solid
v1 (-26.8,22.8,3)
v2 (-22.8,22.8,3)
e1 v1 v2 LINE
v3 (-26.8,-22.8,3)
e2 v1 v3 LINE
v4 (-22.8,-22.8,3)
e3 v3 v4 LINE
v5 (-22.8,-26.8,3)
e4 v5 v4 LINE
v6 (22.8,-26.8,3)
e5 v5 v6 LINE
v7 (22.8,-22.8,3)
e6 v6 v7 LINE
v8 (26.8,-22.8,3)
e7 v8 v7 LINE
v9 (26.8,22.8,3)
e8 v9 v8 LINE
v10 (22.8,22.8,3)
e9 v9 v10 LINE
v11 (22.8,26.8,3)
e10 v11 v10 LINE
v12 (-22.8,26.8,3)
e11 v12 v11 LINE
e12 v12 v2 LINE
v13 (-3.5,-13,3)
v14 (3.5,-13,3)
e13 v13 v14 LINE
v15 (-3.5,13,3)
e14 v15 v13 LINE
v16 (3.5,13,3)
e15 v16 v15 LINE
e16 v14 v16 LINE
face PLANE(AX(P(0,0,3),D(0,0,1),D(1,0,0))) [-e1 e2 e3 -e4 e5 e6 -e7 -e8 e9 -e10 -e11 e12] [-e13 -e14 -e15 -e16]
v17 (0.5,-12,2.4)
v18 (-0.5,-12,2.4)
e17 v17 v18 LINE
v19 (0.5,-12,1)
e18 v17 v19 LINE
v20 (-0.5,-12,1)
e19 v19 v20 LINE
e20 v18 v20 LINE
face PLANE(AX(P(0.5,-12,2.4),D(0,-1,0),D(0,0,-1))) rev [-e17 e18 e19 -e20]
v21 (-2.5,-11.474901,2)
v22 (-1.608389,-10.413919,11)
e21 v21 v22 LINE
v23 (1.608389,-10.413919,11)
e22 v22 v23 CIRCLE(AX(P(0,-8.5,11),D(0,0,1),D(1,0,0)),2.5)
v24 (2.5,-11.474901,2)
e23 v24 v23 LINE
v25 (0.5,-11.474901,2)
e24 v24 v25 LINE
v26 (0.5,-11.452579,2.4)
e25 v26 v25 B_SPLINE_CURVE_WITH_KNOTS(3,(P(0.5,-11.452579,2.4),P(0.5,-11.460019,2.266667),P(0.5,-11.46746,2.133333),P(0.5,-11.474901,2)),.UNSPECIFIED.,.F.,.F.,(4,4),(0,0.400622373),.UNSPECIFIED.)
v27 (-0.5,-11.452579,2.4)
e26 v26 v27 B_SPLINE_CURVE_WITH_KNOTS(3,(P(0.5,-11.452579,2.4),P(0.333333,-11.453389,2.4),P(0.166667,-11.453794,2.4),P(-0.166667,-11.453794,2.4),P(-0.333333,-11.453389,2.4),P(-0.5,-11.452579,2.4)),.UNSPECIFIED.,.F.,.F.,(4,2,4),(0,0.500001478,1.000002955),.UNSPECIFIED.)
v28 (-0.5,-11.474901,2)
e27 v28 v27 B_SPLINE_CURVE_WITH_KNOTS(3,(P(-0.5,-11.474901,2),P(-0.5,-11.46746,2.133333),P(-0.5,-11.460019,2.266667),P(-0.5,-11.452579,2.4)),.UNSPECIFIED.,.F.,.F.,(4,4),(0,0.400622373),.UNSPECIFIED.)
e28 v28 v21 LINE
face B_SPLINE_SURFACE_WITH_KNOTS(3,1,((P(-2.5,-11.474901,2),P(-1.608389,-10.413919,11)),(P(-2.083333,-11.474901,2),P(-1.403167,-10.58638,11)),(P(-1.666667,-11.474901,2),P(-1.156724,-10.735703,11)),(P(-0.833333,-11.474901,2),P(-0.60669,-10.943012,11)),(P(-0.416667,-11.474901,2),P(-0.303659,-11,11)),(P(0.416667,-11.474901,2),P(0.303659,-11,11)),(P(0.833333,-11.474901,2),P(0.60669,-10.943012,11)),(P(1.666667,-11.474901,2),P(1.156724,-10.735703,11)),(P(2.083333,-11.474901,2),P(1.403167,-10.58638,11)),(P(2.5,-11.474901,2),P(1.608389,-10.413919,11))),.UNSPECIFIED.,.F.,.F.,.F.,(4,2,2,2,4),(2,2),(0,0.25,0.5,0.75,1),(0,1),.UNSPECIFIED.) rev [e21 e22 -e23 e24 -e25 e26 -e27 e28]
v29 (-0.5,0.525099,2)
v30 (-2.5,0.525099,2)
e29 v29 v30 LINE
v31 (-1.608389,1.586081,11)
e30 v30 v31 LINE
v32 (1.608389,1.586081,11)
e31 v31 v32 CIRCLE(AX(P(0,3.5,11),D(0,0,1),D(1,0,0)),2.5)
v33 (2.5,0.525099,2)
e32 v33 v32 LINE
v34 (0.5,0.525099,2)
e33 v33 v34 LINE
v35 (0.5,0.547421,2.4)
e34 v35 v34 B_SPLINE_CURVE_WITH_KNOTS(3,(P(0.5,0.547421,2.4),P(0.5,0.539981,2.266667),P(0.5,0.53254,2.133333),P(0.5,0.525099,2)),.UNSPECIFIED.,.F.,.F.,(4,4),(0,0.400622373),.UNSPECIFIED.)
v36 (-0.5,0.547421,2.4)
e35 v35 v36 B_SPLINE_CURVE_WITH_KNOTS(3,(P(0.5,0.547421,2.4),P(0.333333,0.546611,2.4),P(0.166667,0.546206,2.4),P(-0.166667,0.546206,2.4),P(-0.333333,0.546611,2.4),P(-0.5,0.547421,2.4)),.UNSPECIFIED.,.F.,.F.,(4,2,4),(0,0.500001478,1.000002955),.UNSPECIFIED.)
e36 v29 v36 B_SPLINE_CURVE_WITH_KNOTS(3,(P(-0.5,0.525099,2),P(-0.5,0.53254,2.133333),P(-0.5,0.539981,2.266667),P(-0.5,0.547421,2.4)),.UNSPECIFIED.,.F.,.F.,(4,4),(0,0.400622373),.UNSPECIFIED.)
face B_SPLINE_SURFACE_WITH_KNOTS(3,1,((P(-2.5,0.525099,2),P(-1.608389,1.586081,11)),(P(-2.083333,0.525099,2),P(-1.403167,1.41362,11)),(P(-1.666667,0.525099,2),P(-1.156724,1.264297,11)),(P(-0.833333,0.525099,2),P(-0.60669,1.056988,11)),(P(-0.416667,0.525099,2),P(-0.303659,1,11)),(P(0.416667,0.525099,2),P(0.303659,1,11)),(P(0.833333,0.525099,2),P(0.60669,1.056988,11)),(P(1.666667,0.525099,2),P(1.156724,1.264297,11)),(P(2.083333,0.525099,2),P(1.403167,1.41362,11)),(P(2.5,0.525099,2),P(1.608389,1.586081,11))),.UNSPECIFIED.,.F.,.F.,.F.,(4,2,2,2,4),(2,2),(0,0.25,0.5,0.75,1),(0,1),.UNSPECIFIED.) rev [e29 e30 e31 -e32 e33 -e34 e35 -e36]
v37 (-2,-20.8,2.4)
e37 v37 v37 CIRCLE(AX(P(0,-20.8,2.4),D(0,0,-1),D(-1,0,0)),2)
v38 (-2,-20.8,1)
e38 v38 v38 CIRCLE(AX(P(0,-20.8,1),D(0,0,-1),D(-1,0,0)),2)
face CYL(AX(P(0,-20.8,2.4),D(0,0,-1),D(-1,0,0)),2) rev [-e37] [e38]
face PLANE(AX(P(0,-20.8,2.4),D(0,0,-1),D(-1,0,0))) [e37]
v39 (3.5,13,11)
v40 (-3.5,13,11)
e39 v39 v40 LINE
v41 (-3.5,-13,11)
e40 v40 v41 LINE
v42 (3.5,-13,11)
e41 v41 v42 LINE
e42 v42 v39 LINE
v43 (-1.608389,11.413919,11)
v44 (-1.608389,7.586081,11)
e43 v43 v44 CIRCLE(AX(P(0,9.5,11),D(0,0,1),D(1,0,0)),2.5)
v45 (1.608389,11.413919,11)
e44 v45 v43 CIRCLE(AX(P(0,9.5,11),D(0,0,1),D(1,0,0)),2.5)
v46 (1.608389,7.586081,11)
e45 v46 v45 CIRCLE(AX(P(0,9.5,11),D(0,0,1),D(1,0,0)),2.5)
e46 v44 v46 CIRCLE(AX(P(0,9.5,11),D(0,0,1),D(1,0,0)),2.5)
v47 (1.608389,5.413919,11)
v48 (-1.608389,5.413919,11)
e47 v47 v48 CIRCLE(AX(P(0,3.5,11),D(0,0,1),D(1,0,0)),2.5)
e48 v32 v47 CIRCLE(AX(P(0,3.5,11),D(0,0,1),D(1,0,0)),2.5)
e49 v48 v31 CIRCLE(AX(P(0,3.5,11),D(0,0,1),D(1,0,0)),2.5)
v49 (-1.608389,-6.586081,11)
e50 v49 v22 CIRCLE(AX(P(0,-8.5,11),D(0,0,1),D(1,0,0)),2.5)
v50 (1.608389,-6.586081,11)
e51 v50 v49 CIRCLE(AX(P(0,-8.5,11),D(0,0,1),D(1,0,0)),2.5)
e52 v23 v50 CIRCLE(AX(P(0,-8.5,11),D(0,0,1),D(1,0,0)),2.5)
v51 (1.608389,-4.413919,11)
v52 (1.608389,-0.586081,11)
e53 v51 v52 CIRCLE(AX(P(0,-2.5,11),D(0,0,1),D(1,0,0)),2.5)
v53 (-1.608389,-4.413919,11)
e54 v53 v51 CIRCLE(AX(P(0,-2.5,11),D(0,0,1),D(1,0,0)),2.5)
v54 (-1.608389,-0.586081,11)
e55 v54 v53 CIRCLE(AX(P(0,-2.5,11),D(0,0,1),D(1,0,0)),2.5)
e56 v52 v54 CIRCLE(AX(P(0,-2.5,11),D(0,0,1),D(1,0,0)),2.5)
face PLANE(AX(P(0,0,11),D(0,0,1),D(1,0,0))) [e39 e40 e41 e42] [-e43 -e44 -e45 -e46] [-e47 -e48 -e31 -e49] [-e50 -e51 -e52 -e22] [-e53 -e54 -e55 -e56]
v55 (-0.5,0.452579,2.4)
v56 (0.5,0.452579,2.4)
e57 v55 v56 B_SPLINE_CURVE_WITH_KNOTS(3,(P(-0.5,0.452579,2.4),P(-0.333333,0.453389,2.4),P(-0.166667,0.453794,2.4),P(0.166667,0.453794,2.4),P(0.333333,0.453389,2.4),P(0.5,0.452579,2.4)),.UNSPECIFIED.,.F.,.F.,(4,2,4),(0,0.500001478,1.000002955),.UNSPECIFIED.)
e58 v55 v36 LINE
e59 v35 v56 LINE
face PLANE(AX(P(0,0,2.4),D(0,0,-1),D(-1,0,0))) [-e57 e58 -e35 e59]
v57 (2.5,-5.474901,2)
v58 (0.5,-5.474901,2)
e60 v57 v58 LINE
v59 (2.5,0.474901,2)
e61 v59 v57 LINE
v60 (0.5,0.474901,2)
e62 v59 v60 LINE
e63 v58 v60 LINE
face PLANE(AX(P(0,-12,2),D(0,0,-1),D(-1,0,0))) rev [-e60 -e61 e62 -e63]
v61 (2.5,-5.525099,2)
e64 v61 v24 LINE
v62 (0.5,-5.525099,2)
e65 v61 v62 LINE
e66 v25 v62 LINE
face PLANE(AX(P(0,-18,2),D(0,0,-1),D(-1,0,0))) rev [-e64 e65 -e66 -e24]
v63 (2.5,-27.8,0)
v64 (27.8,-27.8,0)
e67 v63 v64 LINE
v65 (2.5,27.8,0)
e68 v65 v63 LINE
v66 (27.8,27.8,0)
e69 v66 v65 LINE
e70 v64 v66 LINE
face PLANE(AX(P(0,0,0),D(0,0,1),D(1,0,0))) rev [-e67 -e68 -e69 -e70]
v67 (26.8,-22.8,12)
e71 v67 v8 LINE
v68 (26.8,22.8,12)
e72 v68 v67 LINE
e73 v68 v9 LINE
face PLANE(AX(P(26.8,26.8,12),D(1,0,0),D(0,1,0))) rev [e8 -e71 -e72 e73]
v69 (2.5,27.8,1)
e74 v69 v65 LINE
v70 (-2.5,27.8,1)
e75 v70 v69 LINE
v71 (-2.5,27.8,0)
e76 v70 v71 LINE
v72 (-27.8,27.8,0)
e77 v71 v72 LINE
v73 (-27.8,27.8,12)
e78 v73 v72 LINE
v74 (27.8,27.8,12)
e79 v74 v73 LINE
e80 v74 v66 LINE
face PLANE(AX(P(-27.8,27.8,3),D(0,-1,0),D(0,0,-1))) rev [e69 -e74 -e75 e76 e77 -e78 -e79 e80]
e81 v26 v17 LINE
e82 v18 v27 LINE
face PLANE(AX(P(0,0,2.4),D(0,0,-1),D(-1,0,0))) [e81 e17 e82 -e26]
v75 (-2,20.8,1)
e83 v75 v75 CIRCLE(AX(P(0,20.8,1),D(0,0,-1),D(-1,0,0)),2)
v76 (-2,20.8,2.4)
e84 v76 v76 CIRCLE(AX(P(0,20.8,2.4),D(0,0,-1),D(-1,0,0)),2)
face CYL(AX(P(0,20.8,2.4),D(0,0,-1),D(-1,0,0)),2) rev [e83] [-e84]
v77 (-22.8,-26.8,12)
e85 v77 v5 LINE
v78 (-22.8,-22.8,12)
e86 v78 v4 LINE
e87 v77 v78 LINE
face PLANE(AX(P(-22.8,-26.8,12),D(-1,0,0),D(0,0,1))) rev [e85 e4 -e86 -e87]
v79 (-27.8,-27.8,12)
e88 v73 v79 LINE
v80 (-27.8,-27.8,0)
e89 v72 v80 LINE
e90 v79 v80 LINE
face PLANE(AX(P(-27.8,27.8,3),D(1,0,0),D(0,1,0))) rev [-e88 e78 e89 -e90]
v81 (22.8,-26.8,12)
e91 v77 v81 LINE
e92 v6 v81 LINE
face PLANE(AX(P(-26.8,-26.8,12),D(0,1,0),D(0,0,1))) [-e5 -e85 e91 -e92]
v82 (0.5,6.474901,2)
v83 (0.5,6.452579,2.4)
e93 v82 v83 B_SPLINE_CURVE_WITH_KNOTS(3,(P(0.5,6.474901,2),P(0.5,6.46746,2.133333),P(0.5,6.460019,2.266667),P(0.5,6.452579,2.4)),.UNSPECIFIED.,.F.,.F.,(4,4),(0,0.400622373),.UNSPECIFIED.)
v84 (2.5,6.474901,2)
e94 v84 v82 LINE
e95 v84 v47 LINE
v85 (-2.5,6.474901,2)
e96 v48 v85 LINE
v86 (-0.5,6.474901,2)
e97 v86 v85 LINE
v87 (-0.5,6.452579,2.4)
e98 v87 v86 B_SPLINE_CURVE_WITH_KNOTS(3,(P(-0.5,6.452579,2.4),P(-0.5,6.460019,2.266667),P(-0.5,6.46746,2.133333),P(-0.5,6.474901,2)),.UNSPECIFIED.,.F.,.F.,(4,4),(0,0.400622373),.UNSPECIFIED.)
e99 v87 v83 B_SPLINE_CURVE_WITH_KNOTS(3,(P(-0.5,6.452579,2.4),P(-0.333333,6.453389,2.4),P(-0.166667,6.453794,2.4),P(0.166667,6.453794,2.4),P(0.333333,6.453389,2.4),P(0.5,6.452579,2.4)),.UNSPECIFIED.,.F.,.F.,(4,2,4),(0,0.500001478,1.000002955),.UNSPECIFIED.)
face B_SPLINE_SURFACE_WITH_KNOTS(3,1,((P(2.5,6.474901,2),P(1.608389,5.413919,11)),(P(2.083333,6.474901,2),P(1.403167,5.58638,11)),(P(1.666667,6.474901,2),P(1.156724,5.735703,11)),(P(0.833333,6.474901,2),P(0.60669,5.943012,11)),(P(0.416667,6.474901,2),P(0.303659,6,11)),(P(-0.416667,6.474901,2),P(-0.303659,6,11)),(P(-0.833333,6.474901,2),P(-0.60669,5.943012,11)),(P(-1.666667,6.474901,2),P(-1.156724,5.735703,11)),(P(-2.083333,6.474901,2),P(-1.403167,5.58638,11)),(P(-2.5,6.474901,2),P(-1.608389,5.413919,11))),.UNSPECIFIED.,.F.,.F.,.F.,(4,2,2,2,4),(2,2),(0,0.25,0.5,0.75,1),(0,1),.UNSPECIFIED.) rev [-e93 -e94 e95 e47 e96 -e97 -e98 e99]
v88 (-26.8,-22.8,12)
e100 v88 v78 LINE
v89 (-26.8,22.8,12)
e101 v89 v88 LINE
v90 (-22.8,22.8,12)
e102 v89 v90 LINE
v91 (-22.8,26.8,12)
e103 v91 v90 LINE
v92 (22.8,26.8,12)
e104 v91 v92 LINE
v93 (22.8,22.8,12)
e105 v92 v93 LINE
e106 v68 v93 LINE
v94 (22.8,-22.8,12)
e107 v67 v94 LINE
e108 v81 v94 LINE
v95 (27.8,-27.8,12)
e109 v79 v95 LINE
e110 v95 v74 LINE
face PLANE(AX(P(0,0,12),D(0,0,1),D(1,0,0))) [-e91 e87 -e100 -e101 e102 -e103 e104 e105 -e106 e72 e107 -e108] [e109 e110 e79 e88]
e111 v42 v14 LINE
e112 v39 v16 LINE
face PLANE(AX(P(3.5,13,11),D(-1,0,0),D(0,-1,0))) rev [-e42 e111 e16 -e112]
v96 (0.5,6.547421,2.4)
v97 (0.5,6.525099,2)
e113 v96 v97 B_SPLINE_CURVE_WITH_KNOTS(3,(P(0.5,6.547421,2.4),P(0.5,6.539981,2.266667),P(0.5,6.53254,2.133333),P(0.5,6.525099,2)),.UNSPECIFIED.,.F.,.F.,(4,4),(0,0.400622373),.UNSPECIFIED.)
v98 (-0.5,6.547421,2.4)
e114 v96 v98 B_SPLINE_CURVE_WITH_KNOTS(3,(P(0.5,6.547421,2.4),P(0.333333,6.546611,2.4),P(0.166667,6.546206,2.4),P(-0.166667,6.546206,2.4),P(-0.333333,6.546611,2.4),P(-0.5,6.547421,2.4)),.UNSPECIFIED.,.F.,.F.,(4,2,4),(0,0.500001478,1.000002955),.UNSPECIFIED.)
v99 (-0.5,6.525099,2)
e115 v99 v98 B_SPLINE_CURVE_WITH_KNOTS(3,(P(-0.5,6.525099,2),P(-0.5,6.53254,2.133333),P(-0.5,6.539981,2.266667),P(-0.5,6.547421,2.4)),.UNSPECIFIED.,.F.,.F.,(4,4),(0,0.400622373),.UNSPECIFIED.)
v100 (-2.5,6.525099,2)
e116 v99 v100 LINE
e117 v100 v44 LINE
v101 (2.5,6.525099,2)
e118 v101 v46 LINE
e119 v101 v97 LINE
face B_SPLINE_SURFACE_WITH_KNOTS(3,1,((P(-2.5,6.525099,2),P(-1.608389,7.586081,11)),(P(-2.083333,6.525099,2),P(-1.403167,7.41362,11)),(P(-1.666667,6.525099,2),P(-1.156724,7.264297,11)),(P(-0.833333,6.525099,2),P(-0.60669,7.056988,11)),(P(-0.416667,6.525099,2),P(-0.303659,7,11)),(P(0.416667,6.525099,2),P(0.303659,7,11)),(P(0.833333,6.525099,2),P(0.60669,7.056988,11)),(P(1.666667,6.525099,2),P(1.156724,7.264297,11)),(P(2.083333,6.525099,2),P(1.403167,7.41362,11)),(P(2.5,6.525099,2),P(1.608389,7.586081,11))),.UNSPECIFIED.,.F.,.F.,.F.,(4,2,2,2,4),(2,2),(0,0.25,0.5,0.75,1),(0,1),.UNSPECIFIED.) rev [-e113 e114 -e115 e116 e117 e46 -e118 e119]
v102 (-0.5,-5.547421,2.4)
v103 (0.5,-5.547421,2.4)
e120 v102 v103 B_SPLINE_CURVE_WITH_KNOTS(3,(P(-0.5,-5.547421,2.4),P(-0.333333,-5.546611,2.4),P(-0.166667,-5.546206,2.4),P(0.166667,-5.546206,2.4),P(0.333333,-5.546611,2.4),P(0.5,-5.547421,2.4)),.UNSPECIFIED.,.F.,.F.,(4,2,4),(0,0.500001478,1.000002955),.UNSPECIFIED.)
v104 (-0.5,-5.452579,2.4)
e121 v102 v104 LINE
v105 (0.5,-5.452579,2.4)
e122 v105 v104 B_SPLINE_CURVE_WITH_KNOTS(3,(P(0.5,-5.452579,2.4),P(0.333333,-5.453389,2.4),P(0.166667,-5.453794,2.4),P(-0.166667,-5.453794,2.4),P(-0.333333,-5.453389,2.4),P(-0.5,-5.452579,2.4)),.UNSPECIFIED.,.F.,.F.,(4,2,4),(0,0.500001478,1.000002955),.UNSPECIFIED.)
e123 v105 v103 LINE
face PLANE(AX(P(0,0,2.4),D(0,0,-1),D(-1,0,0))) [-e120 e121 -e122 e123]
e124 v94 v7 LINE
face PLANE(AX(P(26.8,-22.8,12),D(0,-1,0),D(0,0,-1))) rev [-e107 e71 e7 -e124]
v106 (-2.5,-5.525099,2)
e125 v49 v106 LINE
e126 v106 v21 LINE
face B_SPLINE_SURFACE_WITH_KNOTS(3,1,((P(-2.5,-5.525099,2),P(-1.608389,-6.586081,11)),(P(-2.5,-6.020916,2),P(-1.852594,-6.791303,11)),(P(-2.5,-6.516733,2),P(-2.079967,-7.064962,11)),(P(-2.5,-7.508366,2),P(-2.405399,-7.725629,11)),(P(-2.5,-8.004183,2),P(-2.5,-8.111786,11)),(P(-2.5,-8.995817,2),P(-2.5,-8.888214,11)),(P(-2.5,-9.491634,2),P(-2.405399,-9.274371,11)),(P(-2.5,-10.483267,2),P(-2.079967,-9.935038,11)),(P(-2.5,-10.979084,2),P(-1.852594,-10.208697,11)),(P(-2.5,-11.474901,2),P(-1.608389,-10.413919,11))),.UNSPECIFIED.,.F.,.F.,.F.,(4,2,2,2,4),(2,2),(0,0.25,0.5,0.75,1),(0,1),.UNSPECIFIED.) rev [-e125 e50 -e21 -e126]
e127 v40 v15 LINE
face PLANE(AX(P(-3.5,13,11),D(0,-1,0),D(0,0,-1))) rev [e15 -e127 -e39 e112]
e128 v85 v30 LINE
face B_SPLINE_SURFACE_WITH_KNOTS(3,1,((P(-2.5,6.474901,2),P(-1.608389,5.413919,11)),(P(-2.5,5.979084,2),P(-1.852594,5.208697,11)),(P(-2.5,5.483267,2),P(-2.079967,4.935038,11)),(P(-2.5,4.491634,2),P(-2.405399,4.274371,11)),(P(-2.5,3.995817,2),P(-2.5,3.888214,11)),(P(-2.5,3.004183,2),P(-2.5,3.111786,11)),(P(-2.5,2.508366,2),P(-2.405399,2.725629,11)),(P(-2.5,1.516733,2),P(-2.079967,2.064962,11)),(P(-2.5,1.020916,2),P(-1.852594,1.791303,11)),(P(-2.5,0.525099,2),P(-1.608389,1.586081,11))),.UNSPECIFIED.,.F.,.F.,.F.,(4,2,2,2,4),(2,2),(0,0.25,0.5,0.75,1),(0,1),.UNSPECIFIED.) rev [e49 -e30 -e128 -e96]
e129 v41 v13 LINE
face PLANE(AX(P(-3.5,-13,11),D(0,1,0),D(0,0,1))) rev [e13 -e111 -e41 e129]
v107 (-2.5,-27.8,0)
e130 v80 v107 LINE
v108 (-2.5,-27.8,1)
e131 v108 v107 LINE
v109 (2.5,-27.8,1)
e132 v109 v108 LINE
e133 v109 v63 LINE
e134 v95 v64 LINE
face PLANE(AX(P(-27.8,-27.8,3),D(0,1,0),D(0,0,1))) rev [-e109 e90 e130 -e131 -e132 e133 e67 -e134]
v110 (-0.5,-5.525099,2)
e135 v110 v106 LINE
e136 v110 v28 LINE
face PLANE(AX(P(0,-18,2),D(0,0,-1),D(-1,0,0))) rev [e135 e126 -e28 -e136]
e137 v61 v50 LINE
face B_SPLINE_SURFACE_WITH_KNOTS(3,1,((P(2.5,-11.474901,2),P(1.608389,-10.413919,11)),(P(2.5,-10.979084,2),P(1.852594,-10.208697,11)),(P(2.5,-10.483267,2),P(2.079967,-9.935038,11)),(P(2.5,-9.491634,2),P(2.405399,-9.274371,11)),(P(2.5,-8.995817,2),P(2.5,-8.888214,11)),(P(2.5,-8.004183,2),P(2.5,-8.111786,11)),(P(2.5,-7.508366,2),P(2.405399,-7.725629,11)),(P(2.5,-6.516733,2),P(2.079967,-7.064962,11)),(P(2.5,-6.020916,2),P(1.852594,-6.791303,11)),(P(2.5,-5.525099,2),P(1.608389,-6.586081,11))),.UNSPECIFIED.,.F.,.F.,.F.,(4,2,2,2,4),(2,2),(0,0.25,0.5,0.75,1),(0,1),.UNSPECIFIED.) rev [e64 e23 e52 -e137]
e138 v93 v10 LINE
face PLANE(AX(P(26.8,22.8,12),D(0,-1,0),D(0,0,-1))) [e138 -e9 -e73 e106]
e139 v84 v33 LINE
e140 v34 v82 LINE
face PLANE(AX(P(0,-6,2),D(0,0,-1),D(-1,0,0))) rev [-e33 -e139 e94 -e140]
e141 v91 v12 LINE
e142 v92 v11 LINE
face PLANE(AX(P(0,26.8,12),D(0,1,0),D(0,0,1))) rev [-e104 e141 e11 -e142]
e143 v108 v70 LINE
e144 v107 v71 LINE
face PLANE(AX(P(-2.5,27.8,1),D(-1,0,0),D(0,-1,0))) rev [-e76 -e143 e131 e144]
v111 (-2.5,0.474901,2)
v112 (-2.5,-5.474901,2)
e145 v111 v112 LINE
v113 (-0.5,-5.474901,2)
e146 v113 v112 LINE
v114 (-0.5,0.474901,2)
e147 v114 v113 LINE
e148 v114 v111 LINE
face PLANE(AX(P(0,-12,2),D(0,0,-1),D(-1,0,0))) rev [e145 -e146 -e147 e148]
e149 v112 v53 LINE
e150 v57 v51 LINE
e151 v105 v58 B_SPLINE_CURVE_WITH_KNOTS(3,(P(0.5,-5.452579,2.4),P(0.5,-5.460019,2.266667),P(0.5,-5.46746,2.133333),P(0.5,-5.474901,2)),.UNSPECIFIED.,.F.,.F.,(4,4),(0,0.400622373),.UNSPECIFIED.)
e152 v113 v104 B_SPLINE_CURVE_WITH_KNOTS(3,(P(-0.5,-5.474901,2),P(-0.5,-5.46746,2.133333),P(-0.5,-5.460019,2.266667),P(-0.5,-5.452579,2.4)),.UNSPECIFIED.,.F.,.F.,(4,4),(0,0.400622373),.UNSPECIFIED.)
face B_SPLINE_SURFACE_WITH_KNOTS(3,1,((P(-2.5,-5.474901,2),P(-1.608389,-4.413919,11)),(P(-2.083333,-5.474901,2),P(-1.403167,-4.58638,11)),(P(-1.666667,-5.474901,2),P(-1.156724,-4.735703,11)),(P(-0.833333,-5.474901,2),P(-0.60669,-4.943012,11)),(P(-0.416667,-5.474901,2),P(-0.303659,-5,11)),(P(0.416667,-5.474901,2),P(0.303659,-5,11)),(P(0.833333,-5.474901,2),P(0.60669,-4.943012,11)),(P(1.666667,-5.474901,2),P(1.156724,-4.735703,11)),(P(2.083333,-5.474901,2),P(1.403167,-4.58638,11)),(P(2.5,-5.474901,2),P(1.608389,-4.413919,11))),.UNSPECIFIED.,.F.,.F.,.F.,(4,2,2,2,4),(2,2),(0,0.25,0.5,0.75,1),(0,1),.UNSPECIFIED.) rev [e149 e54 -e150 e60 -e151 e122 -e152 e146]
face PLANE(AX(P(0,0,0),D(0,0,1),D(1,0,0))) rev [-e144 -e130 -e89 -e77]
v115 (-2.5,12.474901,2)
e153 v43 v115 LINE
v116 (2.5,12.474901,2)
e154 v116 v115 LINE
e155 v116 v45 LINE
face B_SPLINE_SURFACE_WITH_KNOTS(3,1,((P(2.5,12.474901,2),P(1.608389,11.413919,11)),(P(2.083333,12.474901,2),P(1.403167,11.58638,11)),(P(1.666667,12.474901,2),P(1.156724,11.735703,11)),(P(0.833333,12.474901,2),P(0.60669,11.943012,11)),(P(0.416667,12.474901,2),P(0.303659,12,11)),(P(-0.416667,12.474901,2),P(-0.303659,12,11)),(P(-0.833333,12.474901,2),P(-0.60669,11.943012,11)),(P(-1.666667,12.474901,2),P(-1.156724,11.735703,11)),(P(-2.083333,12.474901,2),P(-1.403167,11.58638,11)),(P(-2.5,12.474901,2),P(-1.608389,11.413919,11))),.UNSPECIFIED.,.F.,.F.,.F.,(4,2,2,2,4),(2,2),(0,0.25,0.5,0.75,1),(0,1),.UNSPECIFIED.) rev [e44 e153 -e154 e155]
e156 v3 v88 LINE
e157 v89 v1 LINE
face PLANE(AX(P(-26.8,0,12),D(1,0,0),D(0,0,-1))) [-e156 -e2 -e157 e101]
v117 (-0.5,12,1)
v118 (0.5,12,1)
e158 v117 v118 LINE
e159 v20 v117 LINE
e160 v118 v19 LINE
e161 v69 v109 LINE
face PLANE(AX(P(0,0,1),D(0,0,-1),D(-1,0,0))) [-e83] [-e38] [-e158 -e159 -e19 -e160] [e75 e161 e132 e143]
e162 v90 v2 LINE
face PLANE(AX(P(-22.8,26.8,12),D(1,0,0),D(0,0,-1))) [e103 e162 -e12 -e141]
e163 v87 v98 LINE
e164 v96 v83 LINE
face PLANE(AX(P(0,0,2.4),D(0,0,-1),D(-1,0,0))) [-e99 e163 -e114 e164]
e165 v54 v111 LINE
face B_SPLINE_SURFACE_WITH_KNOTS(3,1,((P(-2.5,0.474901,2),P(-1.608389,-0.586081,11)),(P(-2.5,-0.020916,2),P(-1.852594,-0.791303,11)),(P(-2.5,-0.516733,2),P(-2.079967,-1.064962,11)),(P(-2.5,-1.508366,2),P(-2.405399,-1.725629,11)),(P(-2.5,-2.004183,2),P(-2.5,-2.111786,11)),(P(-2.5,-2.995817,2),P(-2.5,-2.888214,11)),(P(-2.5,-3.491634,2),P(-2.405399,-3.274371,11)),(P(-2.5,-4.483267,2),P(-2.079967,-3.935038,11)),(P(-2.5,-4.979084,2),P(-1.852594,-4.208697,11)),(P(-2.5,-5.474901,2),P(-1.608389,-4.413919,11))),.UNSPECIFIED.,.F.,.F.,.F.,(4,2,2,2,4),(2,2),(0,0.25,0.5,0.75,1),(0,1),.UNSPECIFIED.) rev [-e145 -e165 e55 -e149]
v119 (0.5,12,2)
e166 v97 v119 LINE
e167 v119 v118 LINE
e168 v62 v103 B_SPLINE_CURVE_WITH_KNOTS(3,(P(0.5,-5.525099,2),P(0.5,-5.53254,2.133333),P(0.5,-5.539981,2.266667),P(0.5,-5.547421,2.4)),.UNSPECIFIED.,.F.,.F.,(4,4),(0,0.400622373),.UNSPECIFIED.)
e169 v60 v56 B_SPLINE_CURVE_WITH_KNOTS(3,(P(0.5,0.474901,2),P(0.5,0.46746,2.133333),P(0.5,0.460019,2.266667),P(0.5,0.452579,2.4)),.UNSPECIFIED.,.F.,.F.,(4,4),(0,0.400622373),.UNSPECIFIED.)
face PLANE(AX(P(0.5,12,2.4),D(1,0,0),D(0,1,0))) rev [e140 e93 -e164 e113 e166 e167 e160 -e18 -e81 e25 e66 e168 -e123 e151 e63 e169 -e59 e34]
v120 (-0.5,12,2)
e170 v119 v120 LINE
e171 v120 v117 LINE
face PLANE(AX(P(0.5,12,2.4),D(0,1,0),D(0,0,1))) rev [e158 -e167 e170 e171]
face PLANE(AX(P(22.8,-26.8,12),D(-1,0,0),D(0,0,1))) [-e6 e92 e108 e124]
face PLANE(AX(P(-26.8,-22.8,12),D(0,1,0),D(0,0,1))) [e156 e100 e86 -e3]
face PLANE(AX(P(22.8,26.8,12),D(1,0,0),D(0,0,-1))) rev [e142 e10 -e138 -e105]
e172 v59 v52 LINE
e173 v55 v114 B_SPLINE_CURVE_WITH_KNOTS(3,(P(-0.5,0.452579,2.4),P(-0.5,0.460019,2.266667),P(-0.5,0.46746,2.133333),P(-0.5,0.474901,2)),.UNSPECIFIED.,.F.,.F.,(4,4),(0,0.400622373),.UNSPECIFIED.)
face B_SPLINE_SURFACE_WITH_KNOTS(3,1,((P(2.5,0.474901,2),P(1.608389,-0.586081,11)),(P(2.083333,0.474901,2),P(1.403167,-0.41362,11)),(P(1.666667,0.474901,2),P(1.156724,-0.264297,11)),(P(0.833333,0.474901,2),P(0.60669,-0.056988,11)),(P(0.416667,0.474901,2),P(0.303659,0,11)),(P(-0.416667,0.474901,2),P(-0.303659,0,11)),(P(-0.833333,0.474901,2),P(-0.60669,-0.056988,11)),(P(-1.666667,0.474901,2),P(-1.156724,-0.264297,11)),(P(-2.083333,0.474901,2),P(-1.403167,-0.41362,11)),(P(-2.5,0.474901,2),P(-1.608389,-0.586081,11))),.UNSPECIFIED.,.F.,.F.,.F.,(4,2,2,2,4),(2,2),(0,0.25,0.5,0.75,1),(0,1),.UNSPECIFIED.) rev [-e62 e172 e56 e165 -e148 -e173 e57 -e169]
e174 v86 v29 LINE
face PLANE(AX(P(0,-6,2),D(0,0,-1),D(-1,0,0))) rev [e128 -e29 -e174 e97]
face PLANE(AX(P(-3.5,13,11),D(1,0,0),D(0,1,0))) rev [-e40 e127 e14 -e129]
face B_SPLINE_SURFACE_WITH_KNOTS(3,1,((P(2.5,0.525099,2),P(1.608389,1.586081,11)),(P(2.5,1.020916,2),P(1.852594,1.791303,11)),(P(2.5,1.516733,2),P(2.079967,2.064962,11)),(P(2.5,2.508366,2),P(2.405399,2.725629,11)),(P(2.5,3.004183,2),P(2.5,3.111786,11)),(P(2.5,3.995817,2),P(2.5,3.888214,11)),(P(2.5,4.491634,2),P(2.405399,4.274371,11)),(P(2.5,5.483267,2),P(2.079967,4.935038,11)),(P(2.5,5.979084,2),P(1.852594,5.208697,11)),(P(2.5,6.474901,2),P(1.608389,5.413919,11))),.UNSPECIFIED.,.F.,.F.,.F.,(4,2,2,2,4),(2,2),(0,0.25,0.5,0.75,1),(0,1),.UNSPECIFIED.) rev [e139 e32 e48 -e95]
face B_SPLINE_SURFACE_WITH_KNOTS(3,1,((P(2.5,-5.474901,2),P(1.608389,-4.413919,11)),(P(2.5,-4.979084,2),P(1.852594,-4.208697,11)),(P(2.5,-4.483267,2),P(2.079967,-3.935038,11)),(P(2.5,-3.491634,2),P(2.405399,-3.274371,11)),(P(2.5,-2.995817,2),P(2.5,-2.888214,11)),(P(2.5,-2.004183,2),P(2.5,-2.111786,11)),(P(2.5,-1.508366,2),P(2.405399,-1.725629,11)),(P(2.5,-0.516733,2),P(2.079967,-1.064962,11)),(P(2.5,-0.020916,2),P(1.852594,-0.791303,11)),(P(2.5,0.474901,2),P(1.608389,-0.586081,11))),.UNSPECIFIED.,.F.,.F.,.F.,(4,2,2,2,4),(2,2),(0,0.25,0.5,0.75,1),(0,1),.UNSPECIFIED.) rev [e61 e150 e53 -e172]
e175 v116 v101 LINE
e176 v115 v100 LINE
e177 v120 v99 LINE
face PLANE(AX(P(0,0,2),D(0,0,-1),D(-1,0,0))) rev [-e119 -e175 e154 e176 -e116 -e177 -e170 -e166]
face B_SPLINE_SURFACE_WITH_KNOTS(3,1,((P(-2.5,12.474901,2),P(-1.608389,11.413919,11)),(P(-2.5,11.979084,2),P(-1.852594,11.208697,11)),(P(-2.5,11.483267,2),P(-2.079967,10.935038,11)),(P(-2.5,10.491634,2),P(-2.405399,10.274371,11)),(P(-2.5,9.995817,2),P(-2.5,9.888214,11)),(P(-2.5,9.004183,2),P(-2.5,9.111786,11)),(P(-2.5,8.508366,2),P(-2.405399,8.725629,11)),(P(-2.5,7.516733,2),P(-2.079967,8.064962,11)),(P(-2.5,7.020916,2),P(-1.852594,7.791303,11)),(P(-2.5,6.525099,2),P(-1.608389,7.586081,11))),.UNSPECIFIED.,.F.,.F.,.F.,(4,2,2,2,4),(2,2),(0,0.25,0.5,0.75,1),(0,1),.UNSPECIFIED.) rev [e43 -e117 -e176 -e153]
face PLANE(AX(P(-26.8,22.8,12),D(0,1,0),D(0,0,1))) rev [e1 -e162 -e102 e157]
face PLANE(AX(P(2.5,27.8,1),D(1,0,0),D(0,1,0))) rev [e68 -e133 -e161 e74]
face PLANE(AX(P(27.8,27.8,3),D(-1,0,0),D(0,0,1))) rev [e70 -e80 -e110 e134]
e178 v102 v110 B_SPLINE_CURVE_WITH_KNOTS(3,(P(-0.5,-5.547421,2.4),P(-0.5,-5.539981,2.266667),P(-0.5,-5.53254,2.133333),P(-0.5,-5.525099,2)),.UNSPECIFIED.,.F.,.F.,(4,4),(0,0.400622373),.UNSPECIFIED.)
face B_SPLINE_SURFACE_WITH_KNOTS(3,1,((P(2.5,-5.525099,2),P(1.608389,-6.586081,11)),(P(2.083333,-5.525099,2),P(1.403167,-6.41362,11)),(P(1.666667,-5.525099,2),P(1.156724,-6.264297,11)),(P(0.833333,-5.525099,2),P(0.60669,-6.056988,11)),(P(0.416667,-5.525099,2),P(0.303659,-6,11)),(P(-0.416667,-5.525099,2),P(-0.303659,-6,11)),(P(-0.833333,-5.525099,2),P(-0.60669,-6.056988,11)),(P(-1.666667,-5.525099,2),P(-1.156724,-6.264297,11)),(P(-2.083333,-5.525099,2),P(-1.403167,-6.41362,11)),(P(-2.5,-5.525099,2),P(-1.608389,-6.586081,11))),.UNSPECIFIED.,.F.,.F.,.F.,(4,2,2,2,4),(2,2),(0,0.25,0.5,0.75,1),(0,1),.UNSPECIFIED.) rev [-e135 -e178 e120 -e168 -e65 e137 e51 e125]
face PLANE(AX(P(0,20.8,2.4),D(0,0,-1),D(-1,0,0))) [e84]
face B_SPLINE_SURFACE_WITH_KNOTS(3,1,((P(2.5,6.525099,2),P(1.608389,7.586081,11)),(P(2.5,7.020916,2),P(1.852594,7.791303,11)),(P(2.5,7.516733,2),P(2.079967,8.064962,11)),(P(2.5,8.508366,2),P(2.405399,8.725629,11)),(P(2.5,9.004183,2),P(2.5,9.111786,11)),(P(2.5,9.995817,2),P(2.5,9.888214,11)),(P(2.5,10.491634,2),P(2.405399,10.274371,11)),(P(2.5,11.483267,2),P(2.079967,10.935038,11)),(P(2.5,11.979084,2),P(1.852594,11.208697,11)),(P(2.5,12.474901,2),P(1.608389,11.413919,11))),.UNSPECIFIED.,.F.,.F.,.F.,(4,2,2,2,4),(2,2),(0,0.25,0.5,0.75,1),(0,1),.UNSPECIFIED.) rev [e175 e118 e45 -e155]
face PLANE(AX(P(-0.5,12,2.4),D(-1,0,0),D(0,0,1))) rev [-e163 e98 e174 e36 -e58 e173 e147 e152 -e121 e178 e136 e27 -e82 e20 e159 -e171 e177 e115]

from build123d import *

# Parameters (mm, degrees)
SKICA1_W                 = 55.6
SKICA1_H                 = 55.6
P_IDAT_VYSUNUT_M1_DEPTH  = 3
SKICA2_W                 = 5
SKICA2_H                 = 55.6
ODEBRAT_VYSUNUT_M1_DEPTH = 1
SKICA3_R                 = 2
SKICA3_W                 = 1
SKICA3_H                 = 24
ODEBRAT_VYSUNUT_M2_DEPTH = 1.4
SKICA4_W                 = 7
SKICA4_H                 = 26
P_IDAT_VYSUNUT_M2_DEPTH  = 8
LINPOLE1_COUNT           = 4
LINPOLE1_PITCH           = 6
SKICA9_W                 = 54.6
SKICA9_H                 = 1
SKICA9_W_2               = 1
SKICA9_H_2               = 53.6
SKICA9_W_3               = 4
SKICA9_H_3               = 4
P_IDAT_VYSUNUT_M3_DEPTH  = 9


with BuildPart() as part:
    # Skica1 → Přidat vysunutím1 (new body)
    with BuildSketch(Plane.XY):
        Rectangle(SKICA1_W, SKICA1_H)
    extrude(amount=P_IDAT_VYSUNUT_M1_DEPTH)

    # Skica2 → Odebrat vysunutím1 (cut)
    with BuildSketch(Plane(origin=(0, 0, 0), x_dir=(-1, 0, 0), z_dir=(0, 0, -1))):
        Rectangle(SKICA2_W, SKICA2_H)
    extrude(amount=-ODEBRAT_VYSUNUT_M1_DEPTH, mode=Mode.SUBTRACT)

    # Skica3 → Odebrat vysunutím2 (cut)
    with BuildSketch(Plane(origin=(0, 0, 1), x_dir=(-1, 0, 0), z_dir=(0, 0, -1))):
        with Locations((0, 20.8)):
            Circle(SKICA3_R)
        with Locations((0, -20.8)):
            Circle(SKICA3_R)
        Rectangle(SKICA3_W, SKICA3_H)
    extrude(amount=-ODEBRAT_VYSUNUT_M2_DEPTH, mode=Mode.SUBTRACT)

    # Skica4 → Přidat vysunutím2 (add)
    with BuildSketch(Plane.XY.offset(3)):
        Rectangle(SKICA4_W, SKICA4_H)
    extrude(amount=P_IDAT_VYSUNUT_M2_DEPTH)

    # Odebrat spojením profilů2: read off the stored shape, not the designer's step
    # Odebrat spojením profilů2: loft between two sections, ruled curve by curve
    odebrat_spojen_m_profil_2_from = [
        Edge.make_bspline([(-2.5, 6.525099132, 2), (-2.083333333, 6.525099132, 2), (-1.666666667, 6.525099132, 2), (-0.833333333, 6.525099132, 2), (-0.416666667, 6.525099132, 2), (0.416666667, 6.525099132, 2), (0.833333333, 6.525099132, 2), (1.666666667, 6.525099132, 2), (2.083333333, 6.525099132, 2), (2.5, 6.525099132, 2)], [0, 0, 0, 0, 0.25, 0.25, 0.5, 0.5, 0.75, 0.75, 1, 1, 1, 1], 3),
        Edge.make_bspline([(-2.5, 12.474900868, 2), (-2.5, 11.979084057, 2), (-2.5, 11.483267245, 2), (-2.5, 10.491633623, 2), (-2.5, 9.995816811, 2), (-2.5, 9.004183189, 2), (-2.5, 8.508366377, 2), (-2.5, 7.516732755, 2), (-2.5, 7.020915943, 2), (-2.5, 6.525099132, 2)], [0, 0, 0, 0, 0.25, 0.25, 0.5, 0.5, 0.75, 0.75, 1, 1, 1, 1], 3),
        Edge.make_bspline([(2.5, 12.474900868, 2), (2.083333333, 12.474900868, 2), (1.666666667, 12.474900868, 2), (0.833333333, 12.474900868, 2), (0.416666667, 12.474900868, 2), (-0.416666667, 12.474900868, 2), (-0.833333333, 12.474900868, 2), (-1.666666667, 12.474900868, 2), (-2.083333333, 12.474900868, 2), (-2.5, 12.474900868, 2)], [0, 0, 0, 0, 0.25, 0.25, 0.5, 0.5, 0.75, 0.75, 1, 1, 1, 1], 3),
        Edge.make_bspline([(2.5, 6.525099132, 2), (2.5, 7.020915943, 2), (2.5, 7.516732755, 2), (2.5, 8.508366377, 2), (2.5, 9.004183189, 2), (2.5, 9.995816811, 2), (2.5, 10.491633623, 2), (2.5, 11.483267245, 2), (2.5, 11.979084057, 2), (2.5, 12.474900868, 2)], [0, 0, 0, 0, 0.25, 0.25, 0.5, 0.5, 0.75, 0.75, 1, 1, 1, 1], 3),
    ]
    odebrat_spojen_m_profil_2_to = [
        Edge.make_bspline([(-1.608388791, 7.586081116, 11), (-1.403167079, 7.413620149, 11), (-1.156724267, 7.264297071, 11), (-0.606690103, 7.056988388, 11), (-0.303658501, 7, 11), (0.303658501, 7, 11), (0.606690103, 7.056988388, 11), (1.156724267, 7.264297071, 11), (1.403167079, 7.413620149, 11), (1.608388791, 7.586081116, 11)], [0, 0, 0, 0, 0.25, 0.25, 0.5, 0.5, 0.75, 0.75, 1, 1, 1, 1], 3),
        Edge.make_bspline([(-1.608388791, 11.413918884, 11), (-1.852594491, 11.208697172, 11), (-2.079966955, 10.935038102, 11), (-2.405399483, 10.274370851, 11), (-2.5, 9.8882136, 11), (-2.5, 9.1117864, 11), (-2.405399483, 8.725629149, 11), (-2.079966955, 8.064961898, 11), (-1.852594491, 7.791302828, 11), (-1.608388791, 7.586081116, 11)], [0, 0, 0, 0, 0.25, 0.25, 0.5, 0.5, 0.75, 0.75, 1, 1, 1, 1], 3),
        Edge.make_bspline([(1.608388791, 11.413918884, 11), (1.403167079, 11.586379851, 11), (1.156724267, 11.735702929, 11), (0.606690103, 11.943011612, 11), (0.303658501, 12, 11), (-0.303658501, 12, 11), (-0.606690103, 11.943011612, 11), (-1.156724267, 11.735702929, 11), (-1.403167079, 11.586379851, 11), (-1.608388791, 11.413918884, 11)], [0, 0, 0, 0, 0.25, 0.25, 0.5, 0.5, 0.75, 0.75, 1, 1, 1, 1], 3),
        Edge.make_bspline([(1.608388791, 7.586081116, 11), (1.852594491, 7.791302828, 11), (2.079966955, 8.064961898, 11), (2.405399483, 8.725629149, 11), (2.5, 9.1117864, 11), (2.5, 9.8882136, 11), (2.405399483, 10.274370851, 11), (2.079966955, 10.935038102, 11), (1.852594491, 11.208697172, 11), (1.608388791, 11.413918884, 11)], [0, 0, 0, 0, 0.25, 0.25, 0.5, 0.5, 0.75, 0.75, 1, 1, 1, 1], 3),
    ]
    odebrat_spojen_m_profil_2 = Solid(Shell([*[Face.make_surface_from_curves(odebrat_spojen_m_profil_2_from[k], odebrat_spojen_m_profil_2_to[k]) for k in range(4)], Face(Wire(odebrat_spojen_m_profil_2_from)), Face(Wire(odebrat_spojen_m_profil_2_to))]))
    add(odebrat_spojen_m_profil_2, mode=Mode.SUBTRACT)

    # LinPole1: Odebrat spojením profilů2 ×4
    with Locations(*[(0, -i * LINPOLE1_PITCH, 0) for i in range(1, LINPOLE1_COUNT)]):
        add(odebrat_spojen_m_profil_2, mode=Mode.SUBTRACT)

    # Skica9 → Přidat vysunutím3 (add)
    with BuildSketch(Plane.XY.offset(3)):
        Polygon((-26.8, 22.8), (-26.8, 26.8), (-26.8, 27.8), (-27.8, 27.8), (-27.8, -27.8), (-26.8, -27.8), (-26.8, -26.8), (-26.8, -22.8), align=None)
        Polygon((22.8, 26.8), (26.8, 26.8), (27.8, 26.8), (27.8, 27.8), (-26.8, 27.8), (-26.8, 26.8), (-22.8, 26.8), align=None)
        with Locations((0.5, -27.3)):
            Rectangle(SKICA9_W, SKICA9_H)
        with Locations((27.3, 0)):
            Rectangle(SKICA9_W_2, SKICA9_H_2)
        with Locations((-24.8, 24.8)):
            Rectangle(SKICA9_W_3, SKICA9_H_3)
        with Locations((24.8, 24.8)):
            Rectangle(SKICA9_W_3, SKICA9_H_3)
        with Locations((24.8, -24.8)):
            Rectangle(SKICA9_W_3, SKICA9_H_3)
        with Locations((-24.8, -24.8)):
            Rectangle(SKICA9_W_3, SKICA9_H_3)
    extrude(amount=P_IDAT_VYSUNUT_M3_DEPTH)


solid = part.part
